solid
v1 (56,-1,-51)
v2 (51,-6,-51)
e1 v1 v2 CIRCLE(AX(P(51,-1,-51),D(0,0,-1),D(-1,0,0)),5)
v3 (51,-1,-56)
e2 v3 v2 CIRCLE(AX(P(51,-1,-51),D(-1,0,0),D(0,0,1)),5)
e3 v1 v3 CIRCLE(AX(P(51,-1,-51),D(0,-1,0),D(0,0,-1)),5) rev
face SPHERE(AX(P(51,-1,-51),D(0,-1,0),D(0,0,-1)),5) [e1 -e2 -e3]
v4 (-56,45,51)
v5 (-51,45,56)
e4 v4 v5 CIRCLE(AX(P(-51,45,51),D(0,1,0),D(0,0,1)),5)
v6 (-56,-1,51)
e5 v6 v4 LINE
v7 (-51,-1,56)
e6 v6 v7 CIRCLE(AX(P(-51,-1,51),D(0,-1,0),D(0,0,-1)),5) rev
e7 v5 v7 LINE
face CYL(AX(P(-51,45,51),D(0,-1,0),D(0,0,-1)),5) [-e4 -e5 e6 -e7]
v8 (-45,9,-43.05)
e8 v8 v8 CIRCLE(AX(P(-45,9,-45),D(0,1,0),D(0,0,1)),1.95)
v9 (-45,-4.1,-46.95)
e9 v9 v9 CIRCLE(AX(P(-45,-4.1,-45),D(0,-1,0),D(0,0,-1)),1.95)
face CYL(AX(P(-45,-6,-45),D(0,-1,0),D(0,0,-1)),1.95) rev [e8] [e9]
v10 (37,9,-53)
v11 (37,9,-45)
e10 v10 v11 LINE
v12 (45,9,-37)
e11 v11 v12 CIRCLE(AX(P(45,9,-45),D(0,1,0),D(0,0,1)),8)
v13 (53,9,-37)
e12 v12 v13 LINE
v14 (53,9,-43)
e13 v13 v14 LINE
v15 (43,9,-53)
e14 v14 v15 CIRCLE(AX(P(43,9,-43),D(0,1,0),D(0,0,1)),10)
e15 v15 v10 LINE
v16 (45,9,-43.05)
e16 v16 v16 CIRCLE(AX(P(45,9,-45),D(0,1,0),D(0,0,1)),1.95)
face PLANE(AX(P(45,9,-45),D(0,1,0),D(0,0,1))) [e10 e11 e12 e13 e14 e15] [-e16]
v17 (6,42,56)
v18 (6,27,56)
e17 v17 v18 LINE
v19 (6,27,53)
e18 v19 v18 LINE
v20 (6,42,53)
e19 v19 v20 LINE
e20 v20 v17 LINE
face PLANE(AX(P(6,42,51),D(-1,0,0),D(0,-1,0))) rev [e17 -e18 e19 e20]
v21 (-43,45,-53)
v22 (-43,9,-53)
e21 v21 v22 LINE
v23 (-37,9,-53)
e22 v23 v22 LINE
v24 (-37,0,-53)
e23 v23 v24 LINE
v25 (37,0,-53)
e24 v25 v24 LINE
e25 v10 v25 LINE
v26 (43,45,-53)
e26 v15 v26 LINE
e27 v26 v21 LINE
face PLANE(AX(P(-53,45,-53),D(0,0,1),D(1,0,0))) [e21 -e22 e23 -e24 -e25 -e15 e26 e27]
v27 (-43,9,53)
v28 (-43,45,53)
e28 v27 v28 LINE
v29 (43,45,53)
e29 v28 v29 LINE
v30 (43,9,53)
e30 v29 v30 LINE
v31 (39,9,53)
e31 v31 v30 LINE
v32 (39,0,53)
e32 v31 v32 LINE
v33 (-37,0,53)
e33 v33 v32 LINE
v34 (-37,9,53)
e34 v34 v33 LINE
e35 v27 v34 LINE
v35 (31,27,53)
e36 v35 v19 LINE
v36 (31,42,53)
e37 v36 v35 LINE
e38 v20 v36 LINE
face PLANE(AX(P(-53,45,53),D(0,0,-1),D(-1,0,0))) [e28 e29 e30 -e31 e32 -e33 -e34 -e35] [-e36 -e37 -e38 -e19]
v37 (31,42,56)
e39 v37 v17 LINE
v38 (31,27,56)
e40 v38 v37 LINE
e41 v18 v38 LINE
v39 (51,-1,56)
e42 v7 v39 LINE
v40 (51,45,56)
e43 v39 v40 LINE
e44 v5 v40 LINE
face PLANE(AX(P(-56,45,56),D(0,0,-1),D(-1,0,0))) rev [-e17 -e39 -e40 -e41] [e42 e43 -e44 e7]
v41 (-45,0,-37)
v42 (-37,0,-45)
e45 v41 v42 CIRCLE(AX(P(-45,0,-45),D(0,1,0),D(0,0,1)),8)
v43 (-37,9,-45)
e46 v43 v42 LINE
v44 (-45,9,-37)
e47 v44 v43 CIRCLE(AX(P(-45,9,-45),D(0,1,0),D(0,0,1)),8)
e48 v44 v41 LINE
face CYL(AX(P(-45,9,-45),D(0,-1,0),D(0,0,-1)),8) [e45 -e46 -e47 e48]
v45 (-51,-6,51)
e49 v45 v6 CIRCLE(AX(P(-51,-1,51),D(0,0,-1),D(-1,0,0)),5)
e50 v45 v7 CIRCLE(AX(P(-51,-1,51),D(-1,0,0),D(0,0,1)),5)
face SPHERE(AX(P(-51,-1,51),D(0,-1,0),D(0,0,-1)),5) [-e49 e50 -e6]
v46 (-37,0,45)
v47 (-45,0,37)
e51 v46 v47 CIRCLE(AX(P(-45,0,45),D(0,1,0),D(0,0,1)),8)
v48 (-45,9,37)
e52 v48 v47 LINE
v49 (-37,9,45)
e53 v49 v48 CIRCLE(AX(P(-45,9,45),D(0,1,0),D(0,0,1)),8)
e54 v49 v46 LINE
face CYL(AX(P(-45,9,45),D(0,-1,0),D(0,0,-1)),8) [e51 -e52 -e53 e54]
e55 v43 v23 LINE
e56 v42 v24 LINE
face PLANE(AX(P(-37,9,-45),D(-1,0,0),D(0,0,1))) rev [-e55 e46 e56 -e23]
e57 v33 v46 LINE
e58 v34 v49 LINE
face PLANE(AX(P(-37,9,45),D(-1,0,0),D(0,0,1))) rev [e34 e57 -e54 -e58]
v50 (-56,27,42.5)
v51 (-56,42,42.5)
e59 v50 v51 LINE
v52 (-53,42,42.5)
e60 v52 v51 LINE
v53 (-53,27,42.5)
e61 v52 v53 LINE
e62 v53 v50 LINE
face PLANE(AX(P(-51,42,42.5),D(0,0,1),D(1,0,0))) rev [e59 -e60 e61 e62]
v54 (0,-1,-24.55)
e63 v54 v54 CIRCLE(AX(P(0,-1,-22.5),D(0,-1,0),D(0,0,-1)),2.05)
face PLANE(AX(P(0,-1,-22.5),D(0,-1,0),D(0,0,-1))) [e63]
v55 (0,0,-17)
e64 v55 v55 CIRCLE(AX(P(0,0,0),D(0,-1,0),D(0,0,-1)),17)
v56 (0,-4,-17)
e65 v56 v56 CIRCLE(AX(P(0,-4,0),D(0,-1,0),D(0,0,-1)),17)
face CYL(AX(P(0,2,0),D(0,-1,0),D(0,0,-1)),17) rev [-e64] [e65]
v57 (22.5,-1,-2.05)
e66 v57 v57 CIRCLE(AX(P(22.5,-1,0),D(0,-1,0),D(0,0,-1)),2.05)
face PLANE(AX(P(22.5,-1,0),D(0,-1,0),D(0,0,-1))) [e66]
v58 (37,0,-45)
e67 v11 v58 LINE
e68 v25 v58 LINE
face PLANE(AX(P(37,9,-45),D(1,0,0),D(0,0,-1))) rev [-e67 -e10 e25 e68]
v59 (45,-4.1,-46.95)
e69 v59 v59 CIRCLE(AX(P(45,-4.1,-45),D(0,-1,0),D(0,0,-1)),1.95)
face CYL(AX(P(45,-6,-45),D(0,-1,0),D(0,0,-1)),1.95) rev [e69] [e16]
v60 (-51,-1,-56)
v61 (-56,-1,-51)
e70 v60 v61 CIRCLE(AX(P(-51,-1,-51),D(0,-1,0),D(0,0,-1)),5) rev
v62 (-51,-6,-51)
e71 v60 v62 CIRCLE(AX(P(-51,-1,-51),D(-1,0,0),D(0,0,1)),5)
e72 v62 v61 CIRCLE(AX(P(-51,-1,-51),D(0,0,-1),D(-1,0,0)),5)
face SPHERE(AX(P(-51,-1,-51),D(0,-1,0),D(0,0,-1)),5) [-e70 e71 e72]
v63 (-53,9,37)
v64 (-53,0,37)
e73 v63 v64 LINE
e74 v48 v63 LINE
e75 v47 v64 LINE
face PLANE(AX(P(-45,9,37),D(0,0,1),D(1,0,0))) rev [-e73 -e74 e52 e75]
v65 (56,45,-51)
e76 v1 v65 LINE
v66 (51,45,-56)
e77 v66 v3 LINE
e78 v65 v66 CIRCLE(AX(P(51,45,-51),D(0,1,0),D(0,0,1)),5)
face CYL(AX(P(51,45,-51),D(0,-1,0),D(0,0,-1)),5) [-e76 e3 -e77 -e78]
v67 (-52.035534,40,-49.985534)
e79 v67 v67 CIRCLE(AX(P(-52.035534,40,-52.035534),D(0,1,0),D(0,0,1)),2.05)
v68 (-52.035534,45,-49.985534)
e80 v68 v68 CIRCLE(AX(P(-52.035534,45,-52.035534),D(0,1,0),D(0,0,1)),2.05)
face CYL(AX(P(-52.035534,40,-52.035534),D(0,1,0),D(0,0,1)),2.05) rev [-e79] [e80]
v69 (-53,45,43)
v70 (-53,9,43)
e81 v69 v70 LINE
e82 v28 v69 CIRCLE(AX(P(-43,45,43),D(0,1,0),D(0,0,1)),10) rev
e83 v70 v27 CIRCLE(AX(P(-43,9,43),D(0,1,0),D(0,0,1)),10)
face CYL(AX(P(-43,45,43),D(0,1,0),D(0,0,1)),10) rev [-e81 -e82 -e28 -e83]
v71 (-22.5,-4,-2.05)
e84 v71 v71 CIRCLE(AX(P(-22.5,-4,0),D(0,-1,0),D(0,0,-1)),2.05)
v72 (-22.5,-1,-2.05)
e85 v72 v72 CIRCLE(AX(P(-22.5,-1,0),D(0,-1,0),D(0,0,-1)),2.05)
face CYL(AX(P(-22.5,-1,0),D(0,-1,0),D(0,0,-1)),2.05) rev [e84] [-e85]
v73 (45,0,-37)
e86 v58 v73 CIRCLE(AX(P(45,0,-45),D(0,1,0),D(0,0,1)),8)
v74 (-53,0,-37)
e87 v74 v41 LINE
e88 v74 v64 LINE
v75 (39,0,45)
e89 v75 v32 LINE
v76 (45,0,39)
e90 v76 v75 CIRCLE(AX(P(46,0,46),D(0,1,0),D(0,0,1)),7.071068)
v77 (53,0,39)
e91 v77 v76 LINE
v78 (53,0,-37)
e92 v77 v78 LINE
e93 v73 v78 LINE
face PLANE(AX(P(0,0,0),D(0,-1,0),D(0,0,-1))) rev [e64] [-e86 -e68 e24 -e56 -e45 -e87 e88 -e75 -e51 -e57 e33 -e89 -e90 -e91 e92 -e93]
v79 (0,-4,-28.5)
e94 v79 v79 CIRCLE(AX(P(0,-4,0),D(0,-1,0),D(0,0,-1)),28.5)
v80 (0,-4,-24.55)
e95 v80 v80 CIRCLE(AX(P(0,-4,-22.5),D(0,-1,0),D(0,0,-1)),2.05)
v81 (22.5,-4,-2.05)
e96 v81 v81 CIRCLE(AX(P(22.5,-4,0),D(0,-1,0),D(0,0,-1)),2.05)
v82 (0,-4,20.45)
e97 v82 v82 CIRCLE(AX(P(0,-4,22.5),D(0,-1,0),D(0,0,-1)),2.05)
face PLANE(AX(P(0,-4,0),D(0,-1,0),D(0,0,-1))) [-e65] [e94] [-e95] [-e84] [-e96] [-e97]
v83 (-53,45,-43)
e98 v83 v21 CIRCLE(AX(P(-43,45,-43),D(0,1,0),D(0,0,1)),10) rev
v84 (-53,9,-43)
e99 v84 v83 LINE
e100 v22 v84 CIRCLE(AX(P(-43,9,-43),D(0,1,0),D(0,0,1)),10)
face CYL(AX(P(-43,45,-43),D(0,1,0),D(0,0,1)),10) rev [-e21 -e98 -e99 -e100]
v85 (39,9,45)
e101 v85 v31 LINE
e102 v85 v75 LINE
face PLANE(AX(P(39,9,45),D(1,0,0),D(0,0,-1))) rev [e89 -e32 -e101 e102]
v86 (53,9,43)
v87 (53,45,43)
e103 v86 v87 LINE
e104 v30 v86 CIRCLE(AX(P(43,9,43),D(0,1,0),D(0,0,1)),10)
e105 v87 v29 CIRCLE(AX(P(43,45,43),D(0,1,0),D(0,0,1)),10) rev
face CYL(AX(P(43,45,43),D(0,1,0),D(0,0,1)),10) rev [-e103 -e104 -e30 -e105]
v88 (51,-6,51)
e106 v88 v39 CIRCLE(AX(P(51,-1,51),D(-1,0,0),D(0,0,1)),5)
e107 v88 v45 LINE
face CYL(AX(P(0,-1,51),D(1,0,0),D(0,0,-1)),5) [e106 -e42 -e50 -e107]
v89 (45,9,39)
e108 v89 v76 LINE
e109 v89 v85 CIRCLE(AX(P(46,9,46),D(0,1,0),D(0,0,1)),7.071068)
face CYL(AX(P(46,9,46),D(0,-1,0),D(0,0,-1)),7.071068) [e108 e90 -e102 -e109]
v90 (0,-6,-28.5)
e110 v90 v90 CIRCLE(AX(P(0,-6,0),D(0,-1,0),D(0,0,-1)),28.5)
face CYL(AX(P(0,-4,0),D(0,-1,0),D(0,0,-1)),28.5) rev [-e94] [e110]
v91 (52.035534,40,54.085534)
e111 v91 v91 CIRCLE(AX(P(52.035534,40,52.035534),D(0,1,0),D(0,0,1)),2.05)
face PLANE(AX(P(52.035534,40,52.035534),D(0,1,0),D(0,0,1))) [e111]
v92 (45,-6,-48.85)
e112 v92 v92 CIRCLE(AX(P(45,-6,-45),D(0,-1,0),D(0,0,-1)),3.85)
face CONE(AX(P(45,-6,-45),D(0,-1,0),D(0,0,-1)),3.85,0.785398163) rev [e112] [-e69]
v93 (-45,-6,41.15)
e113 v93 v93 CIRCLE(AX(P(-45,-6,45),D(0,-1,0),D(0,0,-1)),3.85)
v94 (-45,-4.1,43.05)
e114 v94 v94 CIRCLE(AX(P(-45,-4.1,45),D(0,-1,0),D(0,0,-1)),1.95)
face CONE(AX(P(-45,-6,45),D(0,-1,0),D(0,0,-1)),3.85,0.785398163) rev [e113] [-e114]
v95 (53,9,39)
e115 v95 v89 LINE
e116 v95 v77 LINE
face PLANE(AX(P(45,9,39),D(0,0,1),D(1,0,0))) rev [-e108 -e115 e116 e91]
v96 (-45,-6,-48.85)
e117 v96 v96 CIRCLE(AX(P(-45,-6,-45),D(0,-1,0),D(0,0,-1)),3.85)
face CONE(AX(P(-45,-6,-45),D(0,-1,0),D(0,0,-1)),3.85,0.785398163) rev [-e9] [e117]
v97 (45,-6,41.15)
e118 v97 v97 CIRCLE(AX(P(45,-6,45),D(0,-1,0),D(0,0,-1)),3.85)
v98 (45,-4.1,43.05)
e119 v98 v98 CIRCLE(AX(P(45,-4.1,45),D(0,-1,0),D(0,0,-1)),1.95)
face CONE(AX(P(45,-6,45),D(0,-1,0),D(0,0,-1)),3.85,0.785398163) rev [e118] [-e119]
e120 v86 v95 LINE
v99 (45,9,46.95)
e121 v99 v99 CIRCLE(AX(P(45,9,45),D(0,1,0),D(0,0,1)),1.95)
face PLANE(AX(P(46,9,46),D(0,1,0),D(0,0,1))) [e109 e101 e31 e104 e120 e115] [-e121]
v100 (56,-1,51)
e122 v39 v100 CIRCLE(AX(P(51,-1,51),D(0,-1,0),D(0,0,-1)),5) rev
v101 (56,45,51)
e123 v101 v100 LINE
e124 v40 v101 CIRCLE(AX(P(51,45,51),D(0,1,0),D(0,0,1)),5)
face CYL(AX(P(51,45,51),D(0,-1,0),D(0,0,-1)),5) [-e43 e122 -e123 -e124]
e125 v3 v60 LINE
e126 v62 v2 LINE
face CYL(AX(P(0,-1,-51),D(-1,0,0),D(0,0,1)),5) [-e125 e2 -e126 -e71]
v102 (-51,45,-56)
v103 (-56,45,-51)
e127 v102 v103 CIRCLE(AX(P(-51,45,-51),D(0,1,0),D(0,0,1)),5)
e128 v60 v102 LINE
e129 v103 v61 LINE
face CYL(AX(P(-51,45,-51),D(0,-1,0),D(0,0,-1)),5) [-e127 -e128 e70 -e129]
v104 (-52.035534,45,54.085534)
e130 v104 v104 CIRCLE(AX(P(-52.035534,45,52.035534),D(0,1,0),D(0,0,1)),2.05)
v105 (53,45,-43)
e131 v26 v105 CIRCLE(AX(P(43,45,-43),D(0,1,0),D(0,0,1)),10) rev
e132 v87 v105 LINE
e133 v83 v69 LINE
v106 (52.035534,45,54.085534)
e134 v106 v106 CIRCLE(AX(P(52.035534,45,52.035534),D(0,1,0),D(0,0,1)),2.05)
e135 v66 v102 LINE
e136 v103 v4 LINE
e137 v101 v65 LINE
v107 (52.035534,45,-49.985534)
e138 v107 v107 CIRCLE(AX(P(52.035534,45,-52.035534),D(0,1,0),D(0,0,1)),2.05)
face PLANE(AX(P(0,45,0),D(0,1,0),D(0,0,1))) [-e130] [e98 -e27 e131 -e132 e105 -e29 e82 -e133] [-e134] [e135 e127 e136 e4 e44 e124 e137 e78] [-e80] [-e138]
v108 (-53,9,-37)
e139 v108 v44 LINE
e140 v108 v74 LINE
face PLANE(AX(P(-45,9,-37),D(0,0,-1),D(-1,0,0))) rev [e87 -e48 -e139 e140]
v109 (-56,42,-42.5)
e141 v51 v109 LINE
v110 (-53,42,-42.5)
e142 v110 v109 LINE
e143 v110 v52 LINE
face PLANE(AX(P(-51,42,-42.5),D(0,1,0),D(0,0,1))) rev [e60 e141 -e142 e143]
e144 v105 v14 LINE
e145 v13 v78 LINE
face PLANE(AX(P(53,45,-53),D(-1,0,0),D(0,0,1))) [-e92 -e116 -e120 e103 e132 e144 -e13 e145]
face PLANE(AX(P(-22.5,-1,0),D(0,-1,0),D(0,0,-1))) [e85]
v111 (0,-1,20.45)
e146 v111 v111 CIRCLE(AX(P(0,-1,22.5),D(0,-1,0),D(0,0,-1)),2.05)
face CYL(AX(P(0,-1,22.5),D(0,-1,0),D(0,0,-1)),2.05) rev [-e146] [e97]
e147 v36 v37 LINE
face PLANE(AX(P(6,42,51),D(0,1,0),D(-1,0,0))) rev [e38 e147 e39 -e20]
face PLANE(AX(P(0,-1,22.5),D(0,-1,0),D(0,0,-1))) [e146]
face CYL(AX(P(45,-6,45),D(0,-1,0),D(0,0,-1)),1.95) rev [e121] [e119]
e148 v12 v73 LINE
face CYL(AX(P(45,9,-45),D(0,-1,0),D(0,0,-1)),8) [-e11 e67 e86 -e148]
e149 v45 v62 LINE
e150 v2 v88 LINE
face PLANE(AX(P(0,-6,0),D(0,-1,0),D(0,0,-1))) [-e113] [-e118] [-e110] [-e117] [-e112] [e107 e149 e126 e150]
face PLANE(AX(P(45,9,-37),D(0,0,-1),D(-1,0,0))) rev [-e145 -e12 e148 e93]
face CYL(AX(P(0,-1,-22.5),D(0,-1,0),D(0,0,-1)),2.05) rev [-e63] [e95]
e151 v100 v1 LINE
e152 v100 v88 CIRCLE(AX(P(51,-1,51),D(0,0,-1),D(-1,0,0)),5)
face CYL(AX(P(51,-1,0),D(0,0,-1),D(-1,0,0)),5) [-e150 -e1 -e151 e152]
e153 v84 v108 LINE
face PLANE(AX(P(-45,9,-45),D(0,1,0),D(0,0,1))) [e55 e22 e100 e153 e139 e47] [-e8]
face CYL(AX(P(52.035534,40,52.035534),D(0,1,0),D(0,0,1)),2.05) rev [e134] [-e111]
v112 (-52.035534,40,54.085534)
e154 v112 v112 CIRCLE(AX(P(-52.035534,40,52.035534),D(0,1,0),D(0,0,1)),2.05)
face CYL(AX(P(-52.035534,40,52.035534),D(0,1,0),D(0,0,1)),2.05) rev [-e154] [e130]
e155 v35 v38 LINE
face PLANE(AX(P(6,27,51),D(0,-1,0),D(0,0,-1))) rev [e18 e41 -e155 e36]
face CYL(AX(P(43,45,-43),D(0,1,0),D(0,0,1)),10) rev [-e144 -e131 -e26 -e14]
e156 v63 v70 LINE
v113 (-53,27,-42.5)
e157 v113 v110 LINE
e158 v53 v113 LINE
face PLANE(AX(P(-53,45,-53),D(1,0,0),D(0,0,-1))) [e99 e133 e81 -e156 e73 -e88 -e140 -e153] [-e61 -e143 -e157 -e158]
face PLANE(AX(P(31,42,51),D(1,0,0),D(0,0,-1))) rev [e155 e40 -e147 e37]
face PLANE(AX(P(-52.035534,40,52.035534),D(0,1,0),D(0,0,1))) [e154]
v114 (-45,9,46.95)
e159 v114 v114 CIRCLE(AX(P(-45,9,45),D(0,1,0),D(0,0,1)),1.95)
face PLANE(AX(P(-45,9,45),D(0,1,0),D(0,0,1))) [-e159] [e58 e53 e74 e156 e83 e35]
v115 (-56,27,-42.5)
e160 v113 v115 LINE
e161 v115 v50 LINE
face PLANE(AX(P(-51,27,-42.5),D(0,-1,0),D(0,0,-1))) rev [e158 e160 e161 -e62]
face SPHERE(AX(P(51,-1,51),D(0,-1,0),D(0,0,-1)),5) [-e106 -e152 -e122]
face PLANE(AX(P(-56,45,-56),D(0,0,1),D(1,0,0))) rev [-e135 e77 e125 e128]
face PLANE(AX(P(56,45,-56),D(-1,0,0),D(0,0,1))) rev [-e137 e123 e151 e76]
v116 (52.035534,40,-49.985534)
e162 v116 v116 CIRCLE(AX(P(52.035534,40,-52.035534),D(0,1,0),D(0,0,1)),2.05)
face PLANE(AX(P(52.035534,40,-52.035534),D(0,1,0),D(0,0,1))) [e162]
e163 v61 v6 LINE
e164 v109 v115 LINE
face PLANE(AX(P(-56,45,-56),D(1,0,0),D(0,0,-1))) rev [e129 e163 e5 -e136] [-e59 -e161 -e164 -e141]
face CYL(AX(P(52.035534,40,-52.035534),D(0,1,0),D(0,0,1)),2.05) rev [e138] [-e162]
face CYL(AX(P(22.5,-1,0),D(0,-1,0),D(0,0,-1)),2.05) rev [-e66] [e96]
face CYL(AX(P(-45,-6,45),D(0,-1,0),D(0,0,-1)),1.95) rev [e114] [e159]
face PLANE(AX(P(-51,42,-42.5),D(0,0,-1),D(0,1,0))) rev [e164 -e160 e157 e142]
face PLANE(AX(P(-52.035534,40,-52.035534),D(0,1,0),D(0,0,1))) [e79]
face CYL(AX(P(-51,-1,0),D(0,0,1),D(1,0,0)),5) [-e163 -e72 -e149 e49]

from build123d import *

# Parameters (mm, degrees)
SKETCH_1_W                     = 112
SKETCH_1_H                     = 112
SKETCH_1_W_2                   = 106
SKETCH_1_H_2                   = 106
EXTRUDE_1_DEPTH                = 45
SKETCH_3_W                     = 112
SKETCH_3_H                     = 112
EXTRUDE_2_DEPTH                = 6
SKETCH_4_R                     = 28.5
CUT_EXTRUDE_2_DEPTH            = 2
SKETCH_5_R                     = 2.05
CUT_EXTRUDE_3_DEPTH            = 3
SKETCH_6_R                     = 17
CUT_EXTRUDE_4_DEPTH            = 6
EXTRUDE_3_DEPTH                = 9
FILLET_1_R                     = 5
SKETCH_8_W                     = 85
SKETCH_8_H                     = 15
CUT_EXTRUDE_5_DEPTH            = 5
SKETCH_9_W                     = 25
SKETCH_9_H                     = 15
CUT_EXTRUDE_6_DEPTH            = 5
SKETCH_10_R                    = 2.05
CUT_EXTRUDE_7_DEPTH            = 5
FILLET_5_R                     = 5
HOLE_WIZARD_M3_5_2_D           = 3.9
HOLE_WIZARD_M3_5_2_CSINK_D     = 7.7
HOLE_WIZARD_M3_5_2_CSINK_ANGLE = 90
FILLET_START                   = 9
FILLET_7_DEPTH                 = 31
FILLET_START_2                 = 40
FILLET_7_2_DEPTH               = 5


with BuildPart() as part:
    # 草图1 → 凸台-拉伸1 (new body)
    with BuildSketch(Plane(origin=(0, 0, 0), x_dir=(1, 0, 0), z_dir=(0, 1, 0))):
        Rectangle(SKETCH_1_W, SKETCH_1_H)
        Rectangle(SKETCH_1_W_2, SKETCH_1_H_2, mode=Mode.SUBTRACT)
    extrude(amount=EXTRUDE_1_DEPTH)

    # 草图3 → 凸台-拉伸2 (add)
    with BuildSketch(Plane.XZ):
        Rectangle(SKETCH_3_W, SKETCH_3_H)
    extrude(amount=EXTRUDE_2_DEPTH)

    # 草图4 → 切除-拉伸2 (cut)
    with BuildSketch(Plane.XZ.offset(6)):
        with Locations(Location((0, 0, 0), (0, 0, 270))):
            Circle(SKETCH_4_R)
    extrude(amount=-CUT_EXTRUDE_2_DEPTH, mode=Mode.SUBTRACT)

    # 草图5 → 切除-拉伸3 (cut)
    with BuildSketch(Plane(origin=(0, -4, 0), x_dir=(-1, 0, 0), z_dir=(0, -1, 0))):
        with Locations(Location((0, -22.5, 0), (0, 0, 90))):
            Circle(SKETCH_5_R)
        with Locations(Location((-22.5, 0, 0), (0, 0, 90))):
            Circle(SKETCH_5_R)
        with Locations(Location((22.5, 0, 0), (0, 0, 90))):
            Circle(SKETCH_5_R)
        with Locations(Location((0, 22.5, 0), (0, 0, 90))):
            Circle(SKETCH_5_R)
    extrude(amount=-CUT_EXTRUDE_3_DEPTH, mode=Mode.SUBTRACT)

    # 草图6 → 切除-拉伸4 (cut)
    with BuildSketch(Plane.XZ.offset(4)):
        with Locations(Location((0, 0, 0), (0, 0, 270))):
            Circle(SKETCH_6_R)
    extrude(amount=-CUT_EXTRUDE_4_DEPTH, mode=Mode.SUBTRACT)

    # 草图7 → 凸台-拉伸3 (add)
    with BuildSketch(Plane(origin=(0, 0, 0), x_dir=(1, 0, 0), z_dir=(0, 1, 0))):
        with BuildLine():
            Line((-45, 37), (-53, 37))
            Line((-53, 37), (-53, 53))
            Line((-53, 53), (-37, 53))
            Line((-37, 53), (-37, 45))
            ThreePointArc((-37, 45), (-39.343145751, 39.343145751), (-45, 37))
        make_face()
        with BuildLine():
            Line((-45, -37), (-53, -37))
            Line((-53, -37), (-53, -53))
            Line((-53, -53), (-37, -53))
            Line((-37, -53), (-37, -45))
            ThreePointArc((-37, -45), (-39.343145751, -39.343145751), (-45, -37))
        make_face()
        with BuildLine():
            Line((45, -39), (53, -39))
            Line((53, -39), (53, -53))
            Line((53, -53), (39, -53))
            Line((39, -53), (39, -45))
            ThreePointArc((39, -45), (41, -41), (45, -39))
        make_face()
        with BuildLine():
            Line((45, 37), (53, 37))
            Line((53, 37), (53, 53))
            Line((53, 53), (37, 53))
            Line((37, 53), (37, 45))
            ThreePointArc((37, 45), (39.343145751, 39.343145751), (45, 37))
        make_face()
    extrude(amount=EXTRUDE_3_DEPTH)

    # 圆角1
    fillet_1_edges = [part.edges().sort_by_distance(p)[0] for p in [
        (56, 19.5, 56),
        (-56, 19.5, 56),
        (-56, 19.5, -56),
        (56, 19.5, -56),
    ]]
    fillet(fillet_1_edges, radius=FILLET_1_R)

    # 草图8 → 切除-拉伸5 (cut)
    with BuildSketch(Plane.ZY.offset(56)):
        with Locations((0, 34.5)):
            Rectangle(SKETCH_8_W, SKETCH_8_H)
    extrude(amount=-CUT_EXTRUDE_5_DEPTH, mode=Mode.SUBTRACT)

    # 草图9 → 切除-拉伸6 (cut)
    with BuildSketch(Plane.XY.offset(56)):
        with Locations((18.5, 34.5)):
            Rectangle(SKETCH_9_W, SKETCH_9_H)
    extrude(amount=-CUT_EXTRUDE_6_DEPTH, mode=Mode.SUBTRACT)

    # 草图10 → 切除-拉伸7 (cut)
    with BuildSketch(Plane(origin=(0, 45, 0), x_dir=(1, 0, 0), z_dir=(0, 1, 0))):
        with Locations((52.035533906, -52.035533906)):
            Circle(SKETCH_10_R)
        with Locations((-52.035533906, -52.035533906)):
            Circle(SKETCH_10_R)
        with Locations((-52.035533906, 52.035533906)):
            Circle(SKETCH_10_R)
        with Locations((52.035533906, 52.035533906)):
            Circle(SKETCH_10_R)
    extrude(amount=-CUT_EXTRUDE_7_DEPTH, mode=Mode.SUBTRACT)

    # 圆角5
    fillet_5_edges = [part.edges().sort_by_distance(p)[0] for p in [
        (56, -6, 0),
        (-56, -6, 0),
        (0, -6, -56),
        (0, -6, 56),
        (-54.535533906, -6, 54.535533906),
        (-54.535533906, -6, -54.535533906),
        (54.535533906, -6, -54.535533906),
        (54.535533906, -6, 54.535533906),
    ]]
    fillet(fillet_5_edges, radius=FILLET_5_R)

    # M3.5 十字槽半沉头木螺钉的锥形沉头孔2 (through all)
    with Locations(Plane(origin=(0, -6, 0), x_dir=(-1, 0, 0), z_dir=(0, -1, 0))):
        with Locations((0, 0), (45, -45), (-45, 45), (-45, -45), (45, 45)):
            CounterSinkHole(HOLE_WIZARD_M3_5_2_D / 2, HOLE_WIZARD_M3_5_2_CSINK_D / 2, counter_sink_angle=HOLE_WIZARD_M3_5_2_CSINK_ANGLE)

    # 圆角7: read off the stored shape, not the designer's step
    # 圆角7 outline → 圆角7 (add)
    with BuildSketch(Plane(origin=(0, 0, 0), x_dir=(1, 0, 0), z_dir=(0, 1, 0)).offset(FILLET_START)):
        with BuildLine():
            Line((53, -53), (53, -43))
            ThreePointArc((53, -43), (50.071067812, -50.071067812), (43, -53))
            Line((43, -53), (53, -53))
        make_face()
        with BuildLine():
            ThreePointArc((43, 53), (50.071067812, 50.071067812), (53, 43))
            Line((53, 43), (53, 53))
            Line((53, 53), (43, 53))
        make_face()
        with BuildLine():
            ThreePointArc((-43, -53), (-50.071067812, -50.071067812), (-53, -43))
            Line((-53, -43), (-53, -53))
            Line((-53, -53), (-43, -53))
        make_face()
        with BuildLine():
            ThreePointArc((-53, 43), (-50.071067812, 50.071067812), (-43, 53))
            Line((-43, 53), (-53, 53))
            Line((-53, 53), (-53, 43))
        make_face()
    extrude(amount=FILLET_7_DEPTH)

    # Fillet 7 2 outline → Fillet 7 2 (add)
    with BuildSketch(Plane(origin=(0, 0, 0), x_dir=(1, 0, 0), z_dir=(0, 1, 0)).offset(FILLET_START_2)):
        with BuildLine():
            ThreePointArc((50.22658251, -53), (50.585965005, -50.585965005), (53, -50.22658251))
            Line((53, -50.22658251), (53, -43))
            ThreePointArc((53, -43), (50.071067812, -50.071067812), (43, -53))
            Line((43, -53), (50.22658251, -53))
        make_face()
        with BuildLine():
            ThreePointArc((43, 53), (50.071067812, 50.071067812), (53, 43))
            Line((53, 43), (53, 50.22658251))
            ThreePointArc((53, 50.22658251), (50.585965005, 50.585965005), (50.22658251, 53))
            Line((50.22658251, 53), (43, 53))
        make_face()
        with BuildLine():
            Line((-50.22658251, -53), (-43, -53))
            ThreePointArc((-43, -53), (-50.071067812, -50.071067812), (-53, -43))
            Line((-53, -43), (-53, -50.22658251))
            ThreePointArc((-53, -50.22658251), (-50.585965005, -50.585965005), (-50.22658251, -53))
        make_face()
        with BuildLine():
            ThreePointArc((-53, 43), (-50.071067812, 50.071067812), (-43, 53))
            Line((-43, 53), (-50.22658251, 53))
            ThreePointArc((-50.22658251, 53), (-50.585965005, 50.585965005), (-53, 50.22658251))
            Line((-53, 50.22658251), (-53, 43))
        make_face()
    extrude(amount=FILLET_7_2_DEPTH)


solid = part.part
